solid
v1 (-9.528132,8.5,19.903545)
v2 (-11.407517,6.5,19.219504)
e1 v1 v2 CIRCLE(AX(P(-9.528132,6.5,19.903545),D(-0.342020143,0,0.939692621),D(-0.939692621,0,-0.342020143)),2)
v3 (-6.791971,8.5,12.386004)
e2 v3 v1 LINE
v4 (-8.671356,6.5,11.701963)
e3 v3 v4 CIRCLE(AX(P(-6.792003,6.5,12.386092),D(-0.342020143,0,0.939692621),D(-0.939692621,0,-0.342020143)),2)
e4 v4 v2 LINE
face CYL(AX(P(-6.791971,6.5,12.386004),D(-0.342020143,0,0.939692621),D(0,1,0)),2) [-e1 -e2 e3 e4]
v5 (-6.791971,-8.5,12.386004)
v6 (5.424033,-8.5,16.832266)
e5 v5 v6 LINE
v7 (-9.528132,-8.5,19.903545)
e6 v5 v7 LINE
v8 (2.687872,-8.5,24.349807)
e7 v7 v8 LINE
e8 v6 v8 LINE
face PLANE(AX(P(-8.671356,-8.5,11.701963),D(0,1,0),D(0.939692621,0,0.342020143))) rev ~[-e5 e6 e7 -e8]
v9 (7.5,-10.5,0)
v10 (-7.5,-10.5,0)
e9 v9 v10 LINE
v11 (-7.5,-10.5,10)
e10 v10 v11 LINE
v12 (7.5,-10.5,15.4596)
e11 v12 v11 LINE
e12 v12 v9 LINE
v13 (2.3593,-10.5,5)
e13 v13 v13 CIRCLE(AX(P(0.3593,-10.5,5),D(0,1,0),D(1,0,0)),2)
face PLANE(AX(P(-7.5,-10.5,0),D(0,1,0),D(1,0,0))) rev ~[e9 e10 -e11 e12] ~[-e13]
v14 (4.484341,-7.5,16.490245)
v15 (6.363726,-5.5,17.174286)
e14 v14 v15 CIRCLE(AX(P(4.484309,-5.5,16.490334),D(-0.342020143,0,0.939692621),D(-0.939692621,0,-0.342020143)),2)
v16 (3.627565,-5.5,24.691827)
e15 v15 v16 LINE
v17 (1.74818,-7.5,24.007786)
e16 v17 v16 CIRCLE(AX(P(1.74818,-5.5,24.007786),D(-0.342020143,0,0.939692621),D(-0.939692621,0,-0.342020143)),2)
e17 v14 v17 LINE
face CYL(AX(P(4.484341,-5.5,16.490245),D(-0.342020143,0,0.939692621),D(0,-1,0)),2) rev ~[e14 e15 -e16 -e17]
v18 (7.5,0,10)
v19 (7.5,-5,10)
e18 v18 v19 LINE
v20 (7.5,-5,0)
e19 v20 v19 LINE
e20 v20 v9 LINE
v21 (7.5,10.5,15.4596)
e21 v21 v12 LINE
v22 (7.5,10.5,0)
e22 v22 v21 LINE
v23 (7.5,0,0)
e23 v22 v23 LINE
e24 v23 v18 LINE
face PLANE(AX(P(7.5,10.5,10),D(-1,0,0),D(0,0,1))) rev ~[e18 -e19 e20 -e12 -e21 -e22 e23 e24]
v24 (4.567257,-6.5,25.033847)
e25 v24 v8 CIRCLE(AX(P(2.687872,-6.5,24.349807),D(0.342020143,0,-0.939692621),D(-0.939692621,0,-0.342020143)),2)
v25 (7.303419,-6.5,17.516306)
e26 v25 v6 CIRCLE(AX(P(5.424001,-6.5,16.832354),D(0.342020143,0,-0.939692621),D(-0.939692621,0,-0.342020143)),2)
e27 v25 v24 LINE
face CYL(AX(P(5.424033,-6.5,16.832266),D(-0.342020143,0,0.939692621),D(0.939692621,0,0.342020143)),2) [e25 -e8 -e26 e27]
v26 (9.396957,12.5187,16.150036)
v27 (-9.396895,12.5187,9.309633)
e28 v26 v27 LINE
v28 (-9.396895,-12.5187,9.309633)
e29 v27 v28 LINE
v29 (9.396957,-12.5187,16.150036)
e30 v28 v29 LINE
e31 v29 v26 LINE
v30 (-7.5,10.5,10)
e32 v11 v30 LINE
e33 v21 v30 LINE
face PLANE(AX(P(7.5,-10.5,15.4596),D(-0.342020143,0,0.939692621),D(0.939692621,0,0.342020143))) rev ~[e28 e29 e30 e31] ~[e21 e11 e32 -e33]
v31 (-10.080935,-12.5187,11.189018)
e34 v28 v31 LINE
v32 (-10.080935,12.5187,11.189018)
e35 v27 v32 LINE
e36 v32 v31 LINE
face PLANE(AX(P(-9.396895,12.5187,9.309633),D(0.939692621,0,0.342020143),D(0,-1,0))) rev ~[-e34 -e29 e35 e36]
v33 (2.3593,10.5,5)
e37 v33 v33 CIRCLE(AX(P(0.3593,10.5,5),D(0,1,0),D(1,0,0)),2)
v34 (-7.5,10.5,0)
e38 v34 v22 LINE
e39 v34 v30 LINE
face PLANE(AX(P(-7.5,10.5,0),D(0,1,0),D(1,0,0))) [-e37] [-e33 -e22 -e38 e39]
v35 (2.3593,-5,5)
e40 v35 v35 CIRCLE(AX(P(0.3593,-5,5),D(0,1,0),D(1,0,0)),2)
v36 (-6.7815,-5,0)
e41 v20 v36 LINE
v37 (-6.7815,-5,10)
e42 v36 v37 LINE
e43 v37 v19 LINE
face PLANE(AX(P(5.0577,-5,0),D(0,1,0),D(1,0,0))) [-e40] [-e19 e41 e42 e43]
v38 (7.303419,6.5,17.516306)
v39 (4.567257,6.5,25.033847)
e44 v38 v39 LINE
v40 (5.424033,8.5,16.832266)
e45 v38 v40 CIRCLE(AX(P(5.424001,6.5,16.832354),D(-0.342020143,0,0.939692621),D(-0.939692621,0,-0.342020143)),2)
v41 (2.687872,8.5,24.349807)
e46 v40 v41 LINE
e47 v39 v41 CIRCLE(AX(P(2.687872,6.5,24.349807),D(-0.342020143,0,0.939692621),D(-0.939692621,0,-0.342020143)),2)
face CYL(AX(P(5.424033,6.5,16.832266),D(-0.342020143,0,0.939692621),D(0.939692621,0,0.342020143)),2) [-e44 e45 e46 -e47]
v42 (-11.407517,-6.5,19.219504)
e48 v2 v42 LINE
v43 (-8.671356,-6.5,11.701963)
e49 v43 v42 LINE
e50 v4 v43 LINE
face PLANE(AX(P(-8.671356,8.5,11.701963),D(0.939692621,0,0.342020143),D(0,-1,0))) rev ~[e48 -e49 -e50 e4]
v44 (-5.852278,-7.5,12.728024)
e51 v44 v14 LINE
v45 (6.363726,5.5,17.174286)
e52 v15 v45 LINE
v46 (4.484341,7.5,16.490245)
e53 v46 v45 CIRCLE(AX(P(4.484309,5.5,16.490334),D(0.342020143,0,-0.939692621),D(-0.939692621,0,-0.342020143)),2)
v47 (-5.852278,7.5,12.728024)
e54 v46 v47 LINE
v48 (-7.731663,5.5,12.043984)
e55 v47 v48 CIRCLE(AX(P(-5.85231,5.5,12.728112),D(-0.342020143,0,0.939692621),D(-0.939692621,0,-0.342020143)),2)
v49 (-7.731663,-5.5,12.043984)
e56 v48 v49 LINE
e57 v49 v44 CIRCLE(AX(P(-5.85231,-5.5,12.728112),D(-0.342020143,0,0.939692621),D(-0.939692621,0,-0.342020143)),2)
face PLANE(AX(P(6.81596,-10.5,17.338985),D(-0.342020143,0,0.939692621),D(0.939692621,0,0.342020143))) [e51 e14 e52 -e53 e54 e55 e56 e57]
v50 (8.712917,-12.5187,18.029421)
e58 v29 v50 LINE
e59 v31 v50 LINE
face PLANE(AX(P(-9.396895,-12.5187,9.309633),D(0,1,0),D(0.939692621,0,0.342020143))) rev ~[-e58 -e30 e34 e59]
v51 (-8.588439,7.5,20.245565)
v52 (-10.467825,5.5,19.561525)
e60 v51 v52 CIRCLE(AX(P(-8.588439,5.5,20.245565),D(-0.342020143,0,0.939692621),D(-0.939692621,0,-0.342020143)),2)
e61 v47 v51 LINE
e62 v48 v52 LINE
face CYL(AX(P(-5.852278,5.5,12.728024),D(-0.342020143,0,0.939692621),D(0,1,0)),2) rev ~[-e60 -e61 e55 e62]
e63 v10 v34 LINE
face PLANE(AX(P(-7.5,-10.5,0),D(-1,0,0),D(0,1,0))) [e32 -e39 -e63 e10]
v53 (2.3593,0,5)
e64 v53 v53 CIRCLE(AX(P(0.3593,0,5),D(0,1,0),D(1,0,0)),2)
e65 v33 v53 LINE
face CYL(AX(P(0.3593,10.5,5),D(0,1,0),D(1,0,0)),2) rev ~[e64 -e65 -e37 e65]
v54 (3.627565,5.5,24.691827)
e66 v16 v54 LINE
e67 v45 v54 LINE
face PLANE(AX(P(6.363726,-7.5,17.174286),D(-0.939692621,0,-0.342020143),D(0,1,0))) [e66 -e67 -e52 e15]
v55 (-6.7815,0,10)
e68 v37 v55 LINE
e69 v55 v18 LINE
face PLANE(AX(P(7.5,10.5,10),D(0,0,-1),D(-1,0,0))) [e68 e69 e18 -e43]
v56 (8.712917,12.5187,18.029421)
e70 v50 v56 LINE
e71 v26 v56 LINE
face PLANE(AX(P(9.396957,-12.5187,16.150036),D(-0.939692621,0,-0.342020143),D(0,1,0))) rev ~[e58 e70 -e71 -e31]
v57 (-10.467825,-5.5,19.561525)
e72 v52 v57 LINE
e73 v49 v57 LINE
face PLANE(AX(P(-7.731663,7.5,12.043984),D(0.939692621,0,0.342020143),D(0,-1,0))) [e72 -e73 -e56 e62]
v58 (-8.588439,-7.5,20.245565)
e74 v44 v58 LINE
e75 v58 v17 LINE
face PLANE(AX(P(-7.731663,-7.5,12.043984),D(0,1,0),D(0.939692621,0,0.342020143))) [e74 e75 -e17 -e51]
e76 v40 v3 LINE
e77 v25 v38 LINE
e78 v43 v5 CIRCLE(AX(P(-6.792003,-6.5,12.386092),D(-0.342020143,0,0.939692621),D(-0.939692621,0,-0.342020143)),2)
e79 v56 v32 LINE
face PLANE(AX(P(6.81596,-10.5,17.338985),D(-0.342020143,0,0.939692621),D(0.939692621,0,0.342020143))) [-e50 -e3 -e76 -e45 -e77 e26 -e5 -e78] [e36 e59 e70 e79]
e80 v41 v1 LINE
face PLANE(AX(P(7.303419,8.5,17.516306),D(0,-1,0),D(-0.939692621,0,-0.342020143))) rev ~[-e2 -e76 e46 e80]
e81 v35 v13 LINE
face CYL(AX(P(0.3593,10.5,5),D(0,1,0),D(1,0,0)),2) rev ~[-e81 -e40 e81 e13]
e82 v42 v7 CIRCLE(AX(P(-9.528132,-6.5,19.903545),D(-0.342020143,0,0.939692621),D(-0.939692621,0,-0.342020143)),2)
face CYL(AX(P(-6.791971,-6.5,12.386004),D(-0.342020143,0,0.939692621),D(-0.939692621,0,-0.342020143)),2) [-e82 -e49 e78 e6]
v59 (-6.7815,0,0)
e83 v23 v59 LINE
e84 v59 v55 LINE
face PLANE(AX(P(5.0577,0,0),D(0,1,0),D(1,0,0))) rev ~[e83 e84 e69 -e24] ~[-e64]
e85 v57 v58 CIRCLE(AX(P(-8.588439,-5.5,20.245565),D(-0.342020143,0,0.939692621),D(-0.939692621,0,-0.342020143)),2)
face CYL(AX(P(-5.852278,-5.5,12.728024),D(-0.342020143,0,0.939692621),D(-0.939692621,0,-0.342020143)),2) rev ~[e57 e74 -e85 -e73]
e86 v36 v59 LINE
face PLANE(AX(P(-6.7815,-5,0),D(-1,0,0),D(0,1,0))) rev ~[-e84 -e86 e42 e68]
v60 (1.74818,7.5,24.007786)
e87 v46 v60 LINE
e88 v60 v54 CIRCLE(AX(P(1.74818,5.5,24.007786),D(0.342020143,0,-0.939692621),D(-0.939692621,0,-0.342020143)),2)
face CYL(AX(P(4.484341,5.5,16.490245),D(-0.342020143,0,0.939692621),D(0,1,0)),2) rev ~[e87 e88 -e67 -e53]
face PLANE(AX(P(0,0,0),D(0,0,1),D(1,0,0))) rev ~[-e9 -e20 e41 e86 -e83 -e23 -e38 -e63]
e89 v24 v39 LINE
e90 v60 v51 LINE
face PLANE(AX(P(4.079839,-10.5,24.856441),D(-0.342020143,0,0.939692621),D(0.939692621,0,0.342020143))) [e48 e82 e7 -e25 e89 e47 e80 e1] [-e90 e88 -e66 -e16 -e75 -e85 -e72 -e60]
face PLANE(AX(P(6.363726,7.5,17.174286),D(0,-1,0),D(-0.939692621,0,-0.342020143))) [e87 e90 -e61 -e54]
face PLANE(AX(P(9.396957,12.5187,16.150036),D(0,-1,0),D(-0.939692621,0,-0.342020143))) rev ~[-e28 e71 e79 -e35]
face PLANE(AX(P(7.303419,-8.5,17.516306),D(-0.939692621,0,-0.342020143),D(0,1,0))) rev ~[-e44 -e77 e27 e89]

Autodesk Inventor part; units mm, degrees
ref_plane "YZ Plane" through (0, 0, 0) normal (1, 0, 0) x (0, 1, 0)
ref_plane "XZ Plane" through (0, 0, 0) normal (0, 1, 0) x (-1, 0, 0)
ref_plane "XY Plane" through (0, 0, 0) normal (0, 0, 1) x (1, 0, 0)
sketch "Эскиз1" plane through (0, 0, 0) normal (0, 0, 1) x (1, 0, 0)
  line L0 (7.5, -5) -> (7.5, 0) projected
  line L1 (5.0577, -5) -> (7.5, -5) projected
  line L2 (5.0577, -5) -> (-4.3392, -5) projected
  line L3 (-6.7815, -5) -> (-4.3392, -5) projected
  line L4 (-6.7815, -5) -> (-6.7815, 0) projected
  line L5 (-6.7815, 0) -> (-4.3392, 0) projected
  line L6 (5.0577, 0) -> (-4.3392, 0) projected
  line L7 (5.0577, 0) -> (7.5, 0) projected
  line L8 (7.5, -10.5) -> (-7.5, -10.5) projected
  line L9 (7.5, 0) -> (-6.7815, 0) projected
  line L10 (7.5, 10.5) -> (7.5, 0) projected
  line L11 (-7.5, 10.5) -> (7.5, 10.5) projected
  line L12 (-7.5, -10.5) -> (-7.5, 10.5) projected
  line L13 (7.5, -10.5) -> (-7.5, -10.5) projected
  line L14 (7.5, -5) -> (7.5, -10.5) projected
  line L15 (7.5, -5) -> (-6.7815, -5) projected
  line L16 (-6.7815, -5) -> (-6.7815, 0) projected
  point P0 (0, 0)
extrude "Выдавливание1" add sketch "Эскиз1" along normal blind 10 contours L14 L8 L12 L11 L10 L7 L6 L5 L4 L3 L2 L1
sketch "Эскиз2" plane through (-7.5, 10.5, 0) normal (0, 1, 0) x (1, 0, 0)
  circle A0 centre (7.8593, -5) radius 2 projected
  point P0 (7.5, 0)
extrude "Выдавливание2" cut sketch "Эскиз2" against normal through all
sketch "Эскиз3" plane through (-7.5, 10.5, 0) normal (0, 1, 0) x (1, 0, 0)
  line L0 (15, -10) -> (0, -10) projected
  line L1 (15, -10) -> (15, -15.4596)
  line L2 (15, -15.4596) -> (0, -10)
  point P0 (7.5, 0)
  dimension "d5" = 20
extrude "Выдавливание3" add sketch "Эскиз3" against normal up to surface (21 mm away)
sketch "Эскиз4" plane through (7.5, -10.5, 15.4596) normal (-0.3420201, 0, 0.9396926) x (0.9396926, 0, 0.3420201)
  line L0 (-15.9627, 0) -> (0, 0) projected
  line L1 (0, 21) -> (0, 0) projected
  line L2 (-15.9627, 21) -> (0, 21) projected
  line L3 (-15.9627, 21) -> (-15.9627, 0) projected
  line L4 (-17.9813, -2.0187) -> (2.0187, -2.0187)
  line L5 (2.0187, -2.0187) -> (2.0187, 23.0187)
  line L6 (2.0187, 23.0187) -> (-17.9813, 23.0187)
  line L7 (-17.9813, 23.0187) -> (-17.9813, -2.0187)
  point P0 (-12.3352, 10.5)
  dimension "d8" = 20
extrude "Выдавливание4" add sketch "Эскиз4" along normal blind 2 contours L3 L2 L1 L0 | L7 L6 L5 L4
sketch "Эскиз5" plane through (6.816, -10.5, 17.3389) normal (-0.3420201, 0, 0.9396926) x (0.9396926, 0, 0.3420201)
  line L0 (0.5187, 19) -> (-16.4813, 19)
  line L1 (-16.4813, 19) -> (-16.4813, 2)
  line L2 (-16.4813, 2) -> (0.5187, 2)
  line L3 (0.5187, 2) -> (0.5187, 19)
  line L4 (2.0187, -2.0187) -> (2.0187, 23.0187) projected
  line L5 (-17.9813, -2.0187) -> (2.0187, -2.0187) projected
  line L6 (-0.4813, 18) -> (-15.4813, 18)
  line L7 (-15.4813, 18) -> (-15.4813, 3)
  line L8 (-15.4813, 3) -> (-0.4813, 3)
  line L9 (-0.4813, 3) -> (-0.4813, 18)
  point P0 (-12.3352, 10.5)
  point P1 (0.5187, 10.5)
  point P2 (2.0187, 10.5)
  point P3 (-7.9813, 2)
  point P4 (-7.9813, -2.0187)
  dimension "d11" = 17
  dimension "d12" = 1
extrude "Выдавливание5" add sketch "Эскиз5" along normal blind 8
fillet "Сопряжение1" radius 2 8 edges at (5.9353, -8.5, 21.2751) (5.9353, 8.5, 21.2751) (-10.0395, 8.5, 15.4608) (-10.0395, -8.5, 15.4608) (-9.0998, 7.5, 15.8028) (4.9956, 7.5, 20.9331) (-9.0998, -7.5, 15.8028) (4.9956, -7.5, 20.9331)
equation "\"degg\" = 70deg"
properties part number "base_70"
